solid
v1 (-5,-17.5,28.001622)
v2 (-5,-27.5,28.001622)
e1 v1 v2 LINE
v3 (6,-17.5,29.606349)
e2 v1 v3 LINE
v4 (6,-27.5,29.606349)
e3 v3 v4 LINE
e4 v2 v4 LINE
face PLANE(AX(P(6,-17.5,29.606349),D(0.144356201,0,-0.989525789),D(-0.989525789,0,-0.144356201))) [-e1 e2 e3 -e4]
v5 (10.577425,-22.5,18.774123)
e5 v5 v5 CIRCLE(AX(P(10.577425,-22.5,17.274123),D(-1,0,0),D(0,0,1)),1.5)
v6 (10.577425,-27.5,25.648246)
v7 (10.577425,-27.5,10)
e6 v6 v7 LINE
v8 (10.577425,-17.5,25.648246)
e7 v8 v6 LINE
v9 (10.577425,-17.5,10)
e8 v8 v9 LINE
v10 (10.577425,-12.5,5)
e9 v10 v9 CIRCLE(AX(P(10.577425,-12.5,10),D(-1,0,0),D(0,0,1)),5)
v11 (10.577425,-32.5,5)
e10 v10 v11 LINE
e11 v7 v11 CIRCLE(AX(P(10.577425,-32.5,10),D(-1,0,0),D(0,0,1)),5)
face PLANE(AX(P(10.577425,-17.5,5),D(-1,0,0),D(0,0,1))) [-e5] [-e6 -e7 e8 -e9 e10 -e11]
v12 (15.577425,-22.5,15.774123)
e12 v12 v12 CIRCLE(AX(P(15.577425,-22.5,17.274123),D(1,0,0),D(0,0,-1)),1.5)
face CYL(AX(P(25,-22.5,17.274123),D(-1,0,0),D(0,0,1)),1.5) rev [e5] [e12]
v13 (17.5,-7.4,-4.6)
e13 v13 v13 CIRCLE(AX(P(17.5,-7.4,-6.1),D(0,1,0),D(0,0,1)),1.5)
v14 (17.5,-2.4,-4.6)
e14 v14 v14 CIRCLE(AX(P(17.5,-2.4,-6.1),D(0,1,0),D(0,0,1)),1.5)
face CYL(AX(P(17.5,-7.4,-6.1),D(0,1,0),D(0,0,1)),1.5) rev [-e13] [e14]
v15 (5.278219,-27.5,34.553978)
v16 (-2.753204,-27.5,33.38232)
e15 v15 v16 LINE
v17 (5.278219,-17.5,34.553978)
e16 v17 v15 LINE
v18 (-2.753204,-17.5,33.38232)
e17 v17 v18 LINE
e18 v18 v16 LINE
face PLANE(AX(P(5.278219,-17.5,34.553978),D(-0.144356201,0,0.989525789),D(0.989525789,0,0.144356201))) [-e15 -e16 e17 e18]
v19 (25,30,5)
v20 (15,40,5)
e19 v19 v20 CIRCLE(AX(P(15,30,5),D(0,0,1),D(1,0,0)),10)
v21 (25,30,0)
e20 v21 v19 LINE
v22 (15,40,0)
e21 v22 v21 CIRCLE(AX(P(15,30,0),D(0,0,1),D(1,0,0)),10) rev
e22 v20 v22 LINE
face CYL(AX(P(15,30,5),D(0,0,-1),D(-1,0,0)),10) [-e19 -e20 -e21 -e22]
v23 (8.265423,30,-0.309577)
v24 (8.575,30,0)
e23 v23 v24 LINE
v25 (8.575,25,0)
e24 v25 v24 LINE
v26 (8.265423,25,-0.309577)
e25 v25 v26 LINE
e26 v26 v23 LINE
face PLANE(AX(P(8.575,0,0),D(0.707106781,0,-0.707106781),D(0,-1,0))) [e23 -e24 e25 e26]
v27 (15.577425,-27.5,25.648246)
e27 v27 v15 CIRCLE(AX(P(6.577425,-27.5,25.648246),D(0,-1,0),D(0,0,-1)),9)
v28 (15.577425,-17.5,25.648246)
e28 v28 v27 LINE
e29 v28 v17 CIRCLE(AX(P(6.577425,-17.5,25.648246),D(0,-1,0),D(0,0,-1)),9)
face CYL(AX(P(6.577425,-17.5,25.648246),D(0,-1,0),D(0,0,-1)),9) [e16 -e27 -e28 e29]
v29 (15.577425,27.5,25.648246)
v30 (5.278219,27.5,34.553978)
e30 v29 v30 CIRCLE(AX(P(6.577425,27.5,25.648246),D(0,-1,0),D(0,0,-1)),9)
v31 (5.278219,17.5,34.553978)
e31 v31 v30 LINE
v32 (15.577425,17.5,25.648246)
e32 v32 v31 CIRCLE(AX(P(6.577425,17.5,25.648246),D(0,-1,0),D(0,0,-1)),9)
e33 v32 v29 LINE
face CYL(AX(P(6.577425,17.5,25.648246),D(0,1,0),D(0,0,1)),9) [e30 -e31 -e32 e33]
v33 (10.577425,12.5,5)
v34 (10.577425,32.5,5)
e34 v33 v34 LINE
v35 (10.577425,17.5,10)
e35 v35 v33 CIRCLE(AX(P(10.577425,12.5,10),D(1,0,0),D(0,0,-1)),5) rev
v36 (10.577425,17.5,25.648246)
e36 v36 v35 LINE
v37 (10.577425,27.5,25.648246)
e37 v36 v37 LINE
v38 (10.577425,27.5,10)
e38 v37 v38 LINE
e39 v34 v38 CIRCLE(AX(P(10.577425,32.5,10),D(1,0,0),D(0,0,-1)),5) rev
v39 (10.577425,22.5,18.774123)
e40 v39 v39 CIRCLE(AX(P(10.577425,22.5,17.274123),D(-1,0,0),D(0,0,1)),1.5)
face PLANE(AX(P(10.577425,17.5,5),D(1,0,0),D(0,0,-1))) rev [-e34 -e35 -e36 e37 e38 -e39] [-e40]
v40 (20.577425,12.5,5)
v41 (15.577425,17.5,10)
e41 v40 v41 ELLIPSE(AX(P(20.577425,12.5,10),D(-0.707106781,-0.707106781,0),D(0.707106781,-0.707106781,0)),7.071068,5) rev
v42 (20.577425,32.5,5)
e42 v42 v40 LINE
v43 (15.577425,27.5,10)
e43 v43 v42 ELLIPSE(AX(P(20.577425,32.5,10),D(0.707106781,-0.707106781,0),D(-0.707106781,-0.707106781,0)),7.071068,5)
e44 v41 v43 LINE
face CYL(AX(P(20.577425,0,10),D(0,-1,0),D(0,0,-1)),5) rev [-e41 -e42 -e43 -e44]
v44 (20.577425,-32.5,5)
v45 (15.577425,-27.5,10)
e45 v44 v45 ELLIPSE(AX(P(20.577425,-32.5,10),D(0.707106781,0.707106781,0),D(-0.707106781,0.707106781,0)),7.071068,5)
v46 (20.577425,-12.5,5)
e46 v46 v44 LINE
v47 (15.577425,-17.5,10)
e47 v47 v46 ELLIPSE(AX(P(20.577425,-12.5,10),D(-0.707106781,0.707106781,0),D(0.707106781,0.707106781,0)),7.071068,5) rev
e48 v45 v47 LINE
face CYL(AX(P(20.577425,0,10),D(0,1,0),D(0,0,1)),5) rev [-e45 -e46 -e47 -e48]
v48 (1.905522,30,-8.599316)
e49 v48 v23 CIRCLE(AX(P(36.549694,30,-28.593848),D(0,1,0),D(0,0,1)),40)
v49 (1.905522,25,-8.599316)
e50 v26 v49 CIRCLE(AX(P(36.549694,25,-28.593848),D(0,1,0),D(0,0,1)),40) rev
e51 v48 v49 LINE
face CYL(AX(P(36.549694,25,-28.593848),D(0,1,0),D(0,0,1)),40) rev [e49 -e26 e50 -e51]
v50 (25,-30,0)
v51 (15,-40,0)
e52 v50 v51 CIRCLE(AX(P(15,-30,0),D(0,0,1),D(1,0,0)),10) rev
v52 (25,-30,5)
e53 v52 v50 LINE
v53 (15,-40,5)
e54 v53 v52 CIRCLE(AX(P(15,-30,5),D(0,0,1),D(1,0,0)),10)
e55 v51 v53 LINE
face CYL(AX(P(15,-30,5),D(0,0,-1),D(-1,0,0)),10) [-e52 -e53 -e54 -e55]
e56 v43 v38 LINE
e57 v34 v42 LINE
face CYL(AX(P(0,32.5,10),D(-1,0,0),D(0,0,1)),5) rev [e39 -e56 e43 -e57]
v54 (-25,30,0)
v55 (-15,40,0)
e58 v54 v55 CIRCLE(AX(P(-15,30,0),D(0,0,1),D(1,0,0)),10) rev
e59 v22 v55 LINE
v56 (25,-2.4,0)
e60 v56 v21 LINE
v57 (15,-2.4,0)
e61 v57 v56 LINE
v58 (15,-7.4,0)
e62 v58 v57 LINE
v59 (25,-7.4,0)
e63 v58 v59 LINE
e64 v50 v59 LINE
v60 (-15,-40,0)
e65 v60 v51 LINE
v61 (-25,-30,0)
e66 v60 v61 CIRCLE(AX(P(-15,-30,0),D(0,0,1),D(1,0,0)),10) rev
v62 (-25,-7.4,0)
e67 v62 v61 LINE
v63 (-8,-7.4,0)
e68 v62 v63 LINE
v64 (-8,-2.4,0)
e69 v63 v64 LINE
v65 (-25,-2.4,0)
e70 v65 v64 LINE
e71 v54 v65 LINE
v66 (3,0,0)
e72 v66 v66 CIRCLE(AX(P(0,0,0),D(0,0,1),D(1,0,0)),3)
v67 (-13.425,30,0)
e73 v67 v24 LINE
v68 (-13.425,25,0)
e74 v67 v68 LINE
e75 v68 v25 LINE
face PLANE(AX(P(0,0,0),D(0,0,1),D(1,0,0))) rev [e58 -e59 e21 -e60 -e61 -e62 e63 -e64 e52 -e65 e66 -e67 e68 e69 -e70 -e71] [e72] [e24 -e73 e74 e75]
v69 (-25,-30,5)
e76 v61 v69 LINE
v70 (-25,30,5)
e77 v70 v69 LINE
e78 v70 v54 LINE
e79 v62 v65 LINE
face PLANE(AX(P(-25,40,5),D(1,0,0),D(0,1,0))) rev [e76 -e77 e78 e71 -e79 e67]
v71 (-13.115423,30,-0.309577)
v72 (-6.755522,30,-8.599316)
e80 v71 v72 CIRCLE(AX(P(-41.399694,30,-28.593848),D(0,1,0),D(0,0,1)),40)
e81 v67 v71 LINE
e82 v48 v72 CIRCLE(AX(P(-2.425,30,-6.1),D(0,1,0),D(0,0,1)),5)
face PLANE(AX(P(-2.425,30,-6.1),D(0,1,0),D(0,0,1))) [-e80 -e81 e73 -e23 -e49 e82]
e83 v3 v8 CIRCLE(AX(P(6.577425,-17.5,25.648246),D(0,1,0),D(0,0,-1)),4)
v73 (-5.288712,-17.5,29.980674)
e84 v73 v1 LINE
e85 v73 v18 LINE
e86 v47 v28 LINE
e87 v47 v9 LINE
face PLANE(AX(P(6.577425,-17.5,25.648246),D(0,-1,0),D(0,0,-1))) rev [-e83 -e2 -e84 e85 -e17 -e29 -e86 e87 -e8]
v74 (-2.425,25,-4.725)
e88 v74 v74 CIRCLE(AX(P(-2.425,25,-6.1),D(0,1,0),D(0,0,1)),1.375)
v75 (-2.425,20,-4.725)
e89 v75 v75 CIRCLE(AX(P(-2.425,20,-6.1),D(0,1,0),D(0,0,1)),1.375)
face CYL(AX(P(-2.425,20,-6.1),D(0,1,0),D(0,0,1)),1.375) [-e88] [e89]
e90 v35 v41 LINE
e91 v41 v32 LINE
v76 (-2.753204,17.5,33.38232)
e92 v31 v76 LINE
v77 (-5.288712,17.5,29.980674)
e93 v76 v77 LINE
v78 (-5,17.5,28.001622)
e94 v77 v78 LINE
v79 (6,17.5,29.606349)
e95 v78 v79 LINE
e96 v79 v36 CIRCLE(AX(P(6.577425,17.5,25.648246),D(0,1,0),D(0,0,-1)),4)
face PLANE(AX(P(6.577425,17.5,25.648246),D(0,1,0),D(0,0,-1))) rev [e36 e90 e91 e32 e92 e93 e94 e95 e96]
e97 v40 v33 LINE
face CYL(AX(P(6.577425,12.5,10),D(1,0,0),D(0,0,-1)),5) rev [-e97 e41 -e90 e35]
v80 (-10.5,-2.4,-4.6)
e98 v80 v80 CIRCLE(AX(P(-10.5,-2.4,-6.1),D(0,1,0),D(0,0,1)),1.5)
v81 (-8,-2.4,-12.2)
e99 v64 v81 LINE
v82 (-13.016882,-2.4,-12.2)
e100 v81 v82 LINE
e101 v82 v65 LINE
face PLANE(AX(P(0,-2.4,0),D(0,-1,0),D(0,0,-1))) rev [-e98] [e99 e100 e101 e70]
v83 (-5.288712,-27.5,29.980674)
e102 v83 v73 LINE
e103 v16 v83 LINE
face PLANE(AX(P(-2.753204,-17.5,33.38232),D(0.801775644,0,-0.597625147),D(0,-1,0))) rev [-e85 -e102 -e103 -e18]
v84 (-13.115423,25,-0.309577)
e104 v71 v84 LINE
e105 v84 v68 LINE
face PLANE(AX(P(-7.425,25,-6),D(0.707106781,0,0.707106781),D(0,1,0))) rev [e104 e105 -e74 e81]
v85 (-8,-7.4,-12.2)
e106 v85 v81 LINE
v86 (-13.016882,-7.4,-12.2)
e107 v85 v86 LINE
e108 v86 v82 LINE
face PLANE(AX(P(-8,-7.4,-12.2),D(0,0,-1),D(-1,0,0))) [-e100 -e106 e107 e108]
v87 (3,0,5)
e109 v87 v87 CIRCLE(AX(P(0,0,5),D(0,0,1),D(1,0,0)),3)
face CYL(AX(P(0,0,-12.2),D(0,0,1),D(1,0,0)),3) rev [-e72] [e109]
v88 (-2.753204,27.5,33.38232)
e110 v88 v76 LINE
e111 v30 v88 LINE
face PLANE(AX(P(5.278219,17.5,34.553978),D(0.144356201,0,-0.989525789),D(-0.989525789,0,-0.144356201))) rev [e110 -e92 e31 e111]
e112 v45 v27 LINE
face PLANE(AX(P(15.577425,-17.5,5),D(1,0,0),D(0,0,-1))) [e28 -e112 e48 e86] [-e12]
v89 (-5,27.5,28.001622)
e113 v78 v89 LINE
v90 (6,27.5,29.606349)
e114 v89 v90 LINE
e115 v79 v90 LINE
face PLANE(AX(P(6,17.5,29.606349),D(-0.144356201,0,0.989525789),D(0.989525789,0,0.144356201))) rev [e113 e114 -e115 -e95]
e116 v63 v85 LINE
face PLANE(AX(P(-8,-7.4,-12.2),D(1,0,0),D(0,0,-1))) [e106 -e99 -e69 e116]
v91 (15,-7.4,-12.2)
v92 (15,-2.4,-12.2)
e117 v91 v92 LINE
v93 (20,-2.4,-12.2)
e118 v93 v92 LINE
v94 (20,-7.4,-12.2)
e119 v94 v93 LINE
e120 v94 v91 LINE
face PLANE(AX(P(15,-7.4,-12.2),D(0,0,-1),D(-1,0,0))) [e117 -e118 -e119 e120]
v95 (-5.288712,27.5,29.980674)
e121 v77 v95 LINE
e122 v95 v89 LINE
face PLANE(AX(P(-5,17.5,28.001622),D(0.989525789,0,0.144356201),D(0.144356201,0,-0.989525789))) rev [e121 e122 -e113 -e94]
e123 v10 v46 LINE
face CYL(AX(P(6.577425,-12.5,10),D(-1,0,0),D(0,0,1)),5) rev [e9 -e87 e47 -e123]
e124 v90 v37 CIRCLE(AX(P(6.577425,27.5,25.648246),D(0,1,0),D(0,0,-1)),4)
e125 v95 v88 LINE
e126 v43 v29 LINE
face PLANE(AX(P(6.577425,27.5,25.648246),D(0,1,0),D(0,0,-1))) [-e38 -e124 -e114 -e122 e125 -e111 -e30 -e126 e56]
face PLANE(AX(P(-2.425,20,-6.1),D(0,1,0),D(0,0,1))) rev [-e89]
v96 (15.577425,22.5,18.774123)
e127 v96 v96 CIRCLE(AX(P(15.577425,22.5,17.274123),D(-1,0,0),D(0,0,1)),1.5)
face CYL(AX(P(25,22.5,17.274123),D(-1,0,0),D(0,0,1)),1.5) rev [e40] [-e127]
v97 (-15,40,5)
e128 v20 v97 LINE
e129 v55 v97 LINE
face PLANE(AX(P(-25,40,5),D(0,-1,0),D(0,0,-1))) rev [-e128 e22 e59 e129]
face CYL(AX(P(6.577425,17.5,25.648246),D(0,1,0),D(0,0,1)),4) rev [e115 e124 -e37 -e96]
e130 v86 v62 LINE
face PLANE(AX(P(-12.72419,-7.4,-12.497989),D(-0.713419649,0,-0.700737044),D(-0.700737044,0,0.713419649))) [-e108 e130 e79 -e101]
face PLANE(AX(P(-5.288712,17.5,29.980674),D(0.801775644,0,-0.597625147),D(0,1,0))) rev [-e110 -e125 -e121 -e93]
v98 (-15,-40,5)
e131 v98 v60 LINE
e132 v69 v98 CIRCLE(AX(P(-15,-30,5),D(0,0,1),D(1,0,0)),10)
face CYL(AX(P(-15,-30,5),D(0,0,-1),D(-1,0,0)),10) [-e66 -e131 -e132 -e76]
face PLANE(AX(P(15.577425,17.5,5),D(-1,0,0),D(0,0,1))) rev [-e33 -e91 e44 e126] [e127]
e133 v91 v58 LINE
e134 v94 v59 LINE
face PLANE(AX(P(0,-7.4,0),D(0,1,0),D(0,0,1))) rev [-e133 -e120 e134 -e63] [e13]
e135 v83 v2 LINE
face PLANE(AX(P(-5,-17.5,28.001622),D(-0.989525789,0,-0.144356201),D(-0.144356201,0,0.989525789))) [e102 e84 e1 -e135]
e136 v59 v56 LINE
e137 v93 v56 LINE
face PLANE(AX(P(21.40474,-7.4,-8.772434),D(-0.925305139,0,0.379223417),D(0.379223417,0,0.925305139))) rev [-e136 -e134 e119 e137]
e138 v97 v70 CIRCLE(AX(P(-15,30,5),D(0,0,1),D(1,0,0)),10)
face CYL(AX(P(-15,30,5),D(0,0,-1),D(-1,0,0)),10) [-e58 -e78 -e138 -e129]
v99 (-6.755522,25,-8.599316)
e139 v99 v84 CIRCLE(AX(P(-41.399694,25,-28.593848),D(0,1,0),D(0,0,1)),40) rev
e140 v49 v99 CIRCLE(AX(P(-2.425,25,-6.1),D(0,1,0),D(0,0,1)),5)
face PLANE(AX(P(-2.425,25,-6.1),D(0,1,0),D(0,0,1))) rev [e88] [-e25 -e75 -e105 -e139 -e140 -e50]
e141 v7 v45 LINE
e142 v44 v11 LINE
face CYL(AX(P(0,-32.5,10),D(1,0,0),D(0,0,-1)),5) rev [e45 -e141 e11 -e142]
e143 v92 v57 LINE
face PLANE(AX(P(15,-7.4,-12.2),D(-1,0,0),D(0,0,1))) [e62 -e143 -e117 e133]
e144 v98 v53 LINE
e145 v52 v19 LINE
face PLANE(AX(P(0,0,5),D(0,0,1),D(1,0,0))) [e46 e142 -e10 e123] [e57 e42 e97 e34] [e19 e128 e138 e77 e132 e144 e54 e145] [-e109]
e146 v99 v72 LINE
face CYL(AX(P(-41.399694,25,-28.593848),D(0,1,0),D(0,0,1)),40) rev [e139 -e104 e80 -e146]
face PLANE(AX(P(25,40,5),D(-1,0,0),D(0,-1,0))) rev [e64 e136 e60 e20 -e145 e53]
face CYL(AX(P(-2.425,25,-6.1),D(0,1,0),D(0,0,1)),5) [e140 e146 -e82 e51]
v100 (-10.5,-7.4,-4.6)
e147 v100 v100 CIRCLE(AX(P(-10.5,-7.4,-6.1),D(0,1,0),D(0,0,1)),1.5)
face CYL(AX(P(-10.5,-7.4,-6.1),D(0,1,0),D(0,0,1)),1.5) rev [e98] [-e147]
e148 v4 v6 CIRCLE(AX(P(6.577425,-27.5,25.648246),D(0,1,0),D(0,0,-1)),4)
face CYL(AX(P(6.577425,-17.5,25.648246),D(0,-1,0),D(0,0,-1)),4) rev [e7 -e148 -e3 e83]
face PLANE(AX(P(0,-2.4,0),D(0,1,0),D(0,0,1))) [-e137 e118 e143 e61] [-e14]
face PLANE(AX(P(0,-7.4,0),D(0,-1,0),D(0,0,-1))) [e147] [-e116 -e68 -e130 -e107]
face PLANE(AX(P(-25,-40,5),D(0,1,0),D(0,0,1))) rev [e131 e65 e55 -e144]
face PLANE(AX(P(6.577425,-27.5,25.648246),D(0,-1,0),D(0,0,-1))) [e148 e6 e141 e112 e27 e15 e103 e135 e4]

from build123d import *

# Parameters (mm, degrees)
ESQUISSE1_W             = 50
ESQUISSE1_H             = 80
BOSS_EXTRU_1_DEPTH      = 5
BOSS_EXTRU_2_START      = -42.4
ESQUISSE2_W             = 5
ESQUISSE2_H             = 12.2
ESQUISSE2_R             = 1.5
ESQUISSE2_W_2           = 5.01688185
BOSS_EXTRU_2_DEPTH      = 5
ESQUISSE3_R             = 3
ENL_V_MAT_EXTRU_1_DEPTH = 51.207967495
BOSS_EXTRU_3_START      = -10
ESQUISSE5_R             = 1.375
BOSS_EXTRU_3_DEPTH      = 5
ESQUISSE6_R             = 1.375
BOSS_EXTRU_4_DEPTH      = 10
BOSS_EXTRU_5_START      = -12.5
BOSS_EXTRU_5_DEPTH      = 10
CONG_1_R                = 5
CONG_2_R                = 5
CONG_3_R                = 5
CONG_1_OF_SYM_TRIE1_R   = 5
CONG_2_OF_SYM_TRIE1_R   = 5
CONG_3_OF_SYM_TRIE1_R   = 5
CHANFREIN1_SIZE         = 3
BOSS_EXTRU_6_DEPTH      = 5
ESQUISSE10_R            = 1.5
ENL_V_MAT_EXTRU_2_DEPTH = 64.767186518
CONG_4_R                = 10
CHANFREIN5_START        = -9.492908537
CHANFREIN5_OUTLINE_W    = 12
CHANFREIN5_OUTLINE_H    = 5
CHANFREIN5_DEPTH        = 4.242640687
CHANFREIN6_START        = 1.820799962
CHANFREIN6_OUTLINE_W    = 12
CHANFREIN6_OUTLINE_H    = 5
CHANFREIN6_DEPTH        = 4.242640687
CONG_5_START            = 25
CONG_5_DEPTH            = 5
CONG_6_START            = 25
CONG_6_DEPTH            = 5


with BuildPart() as part:
    # Esquisse1 → Boss.-Extru.1 (new body)
    with BuildSketch(Plane.XY):
        Rectangle(ESQUISSE1_W, ESQUISSE1_H)
    extrude(amount=BOSS_EXTRU_1_DEPTH)

    # Esquisse2 → Boss.-Extru.2 (add)
    # profile 1 of 2: a face of its own
    with BuildSketch(Plane(origin=(0, 40, 0), x_dir=(1, 0, 0), z_dir=(0, 1, 0)).offset(BOSS_EXTRU_2_START)):
        with Locations((17.5, 6.1)):
            Rectangle(ESQUISSE2_W, ESQUISSE2_H)
        with Locations(Location((17.5, 6.1, 0), (0, 0, 270))):
            Circle(ESQUISSE2_R, mode=Mode.SUBTRACT)
    # profile 2 of 2: a face of its own
    with BuildSketch(Plane(origin=(0, 40, 0), x_dir=(1, 0, 0), z_dir=(0, 1, 0)).offset(BOSS_EXTRU_2_START)):
        with Locations((-10.508440925, 6.1)):
            Rectangle(ESQUISSE2_W_2, ESQUISSE2_H)
        with Locations(Location((-10.5, 6.1, 0), (0, 0, 270))):
            Circle(ESQUISSE2_R, mode=Mode.SUBTRACT)
    extrude(amount=-BOSS_EXTRU_2_DEPTH)

    # Esquisse3 → Enlèv. mat.-Extru.1 (cut, through all)
    with BuildSketch(Plane.XY.offset(5)):
        Circle(ESQUISSE3_R)
    extrude(amount=-ENL_V_MAT_EXTRU_1_DEPTH, mode=Mode.SUBTRACT)

    # Esquisse5 → Boss.-Extru.3 (add)
    with BuildSketch(Plane(origin=(0, 40, 0), x_dir=(1, 0, 0), z_dir=(0, 1, 0)).offset(BOSS_EXTRU_3_START)):
        with BuildLine():
            Line((-7.425, 6.1), (-7.425, 0))
            Line((-7.425, 0), (2.575, 0))
            Line((2.575, 0), (2.575, 6.1))
            ThreePointArc((2.575, 6.1), (-2.425, 11.1), (-7.425, 6.1))
        make_face()
        with Locations(Location((-2.425, 6.1, 0), (0, 0, 270))):
            Circle(ESQUISSE5_R, mode=Mode.SUBTRACT)
    extrude(amount=-BOSS_EXTRU_3_DEPTH)

    # Esquisse6 → Boss.-Extru.4 (add)
    with BuildSketch(Plane(origin=(0, 30, 0), x_dir=(1, 0, 0), z_dir=(0, 1, 0))):
        with Locations(Location((-2.425, 6.1, 0), (0, 0, 270))):
            Circle(ESQUISSE6_R)
    extrude(amount=-BOSS_EXTRU_4_DEPTH)

    # Esquisse7 → Boss.-Extru.5 (add)
    with BuildSketch(Plane.XZ.offset(40).offset(BOSS_EXTRU_5_START)):
        with BuildLine():
            Line((10.577424804, 5), (10.577424804, 25.648245565))
            ThreePointArc((10.577424804, 25.648245565), (9.193748636, 28.673943766), (6, 29.606348721))
            Line((6, 29.606348721), (-5, 28.001622266))
            Line((-5, 28.001622266), (-5.721781005, 32.949251212))
            Line((-5.721781005, 32.949251212), (5.278218995, 34.553977666))
            ThreePointArc((5.278218995, 34.553977666), (12.464153425, 32.456066518), (15.577424804, 25.648245565))
            Line((15.577424804, 25.648245565), (15.577424804, 5))
            Line((15.577424804, 5), (10.577424804, 5))
        make_face()
    boss_extru_5 = extrude(amount=-BOSS_EXTRU_5_DEPTH)

    # Congé1
    cong_1_edges = [part.edges().sort_by_distance(p)[0] for p in [
        (15.577424804, -22.5, 5),
    ]]
    fillet(cong_1_edges, radius=CONG_1_R)

    # Congé2
    cong_2_edges = [part.edges().sort_by_distance(p)[0] for p in [
        (15.577424804, -17.5, 5),
    ]]
    fillet(cong_2_edges, radius=CONG_2_R)

    # Congé3
    cong_3_edges = [part.edges().sort_by_distance(p)[0] for p in [
        (15.577424804, -27.5, 5),
    ]]
    fillet(cong_3_edges, radius=CONG_3_R)

    # Symétrie1: Boss.-Extru.5 across plane
    add(boss_extru_5.mirror(Plane.ZX))

    # Congé1 of Symétrie1
    cong_1_of_sym_trie1_edges = [part.edges().sort_by_distance(p)[0] for p in [
        (15.577424804, 22.5, 5),
    ]]
    fillet(cong_1_of_sym_trie1_edges, radius=CONG_1_OF_SYM_TRIE1_R)

    # Congé2 of Symétrie1
    cong_2_of_sym_trie1_edges = [part.edges().sort_by_distance(p)[0] for p in [
        (15.577424804, 17.5, 5),
    ]]
    fillet(cong_2_of_sym_trie1_edges, radius=CONG_2_OF_SYM_TRIE1_R)

    # Congé3 of Symétrie1
    cong_3_of_sym_trie1_edges = [part.edges().sort_by_distance(p)[0] for p in [
        (15.577424804, 27.5, 5),
    ]]
    fillet(cong_3_of_sym_trie1_edges, radius=CONG_3_OF_SYM_TRIE1_R)

    # Chanfrein1
    chanfrein1_edges = [part.edges().sort_by_distance(p)[0] for p in [
        (-5.721781005, 22.5, 32.949251212),
        (-5.721781005, -22.5, 32.949251212),
    ]]
    chamfer(chanfrein1_edges, length=CHANFREIN1_SIZE)

    # Esquisse9 → Boss.-Extru.6 (add)
    with BuildSketch(Plane(origin=(0, -2.4, 0), x_dir=(1, 0, 0), z_dir=(0, 1, 0))):
        Polygon((-13.01688185, 12.2), (-25, 0), (-13.01688185, 0), align=None)
        Polygon((20, 12.2), (25, 0), (20, 0), align=None)
    extrude(amount=-BOSS_EXTRU_6_DEPTH)

    # Esquisse10 → Enlèv. mat.-Extru.2 (cut, through all)
    with BuildSketch(Plane.ZY.offset(-10.577424804)):
        with Locations((17.274122782, -22.5)):
            Circle(ESQUISSE10_R)
        with Locations((17.274122782, 22.5)):
            Circle(ESQUISSE10_R)
    extrude(amount=-ENL_V_MAT_EXTRU_2_DEPTH, mode=Mode.SUBTRACT)

    # Congé4
    cong_4_edges = [part.edges().sort_by_distance(p)[0] for p in [
        (25, -40, 2.5),
        (-25, -40, 2.5),
        (-25, 40, 2.5),
        (25, 40, 2.5),
    ]]
    fillet(cong_4_edges, radius=CONG_4_R)

    # Chanfrein5: read off the stored shape, not the designer's step
    # Chanfrein5 outline → Chanfrein5 (add)
    with BuildSketch(Plane(origin=(0, 0, 0), x_dir=(0.707106781186548, 0, -0.707106781186547), z_dir=(0.707106781186547, 0, 0.707106781186548)).offset(CHANFREIN5_START)):
        with Locations((-5, 27.5)):
            Rectangle(CHANFREIN5_OUTLINE_W, CHANFREIN5_OUTLINE_H)
    extrude(amount=CHANFREIN5_DEPTH)

    # Chanfrein6: read off the stored shape, not the designer's step
    # Chanfrein6 outline → Chanfrein6 (add)
    with BuildSketch(Plane(origin=(0, 0, 0), x_dir=(0.707106781186548, 0, 0.707106781186547), z_dir=(0.707106781186547, 0, -0.707106781186548)).offset(CHANFREIN6_START)):
        with Locations((2, -27.5)):
            Rectangle(CHANFREIN6_OUTLINE_W, CHANFREIN6_OUTLINE_H)
    extrude(amount=CHANFREIN6_DEPTH)

    # Congé5: read off the stored shape, not the designer's step
    # Congé5 outline → Congé5 (add)
    with BuildSketch(Plane(origin=(0, 0, 0), x_dir=(1, 0, 0), z_dir=(0, 1, 0)).offset(CONG_5_START)):
        with BuildLine():
            ThreePointArc((-6.755521581, 8.599316474), (-9.663638899, 4.245895741), (-13.11542298, 0.30957702))
            Line((-13.11542298, 0.30957702), (-7.425, 6))
            Line((-7.425, 6), (-7.425, 6.1))
            ThreePointArc((-7.425, 6.1), (-7.254731251, 7.393714052), (-6.755521581, 8.599316474))
        make_face()
    extrude(amount=CONG_5_DEPTH)

    # Congé6: read off the stored shape, not the designer's step
    # Congé6 outline → Congé6 (add)
    with BuildSketch(Plane(origin=(0, 0, 0), x_dir=(1, 0, 0), z_dir=(0, 1, 0)).offset(CONG_6_START)):
        with BuildLine():
            ThreePointArc((8.26542298, 0.30957702), (4.813638899, 4.245895741), (1.905521581, 8.599316474))
            ThreePointArc((1.905521581, 8.599316474), (2.40473125, 7.393714052), (2.575, 6.1))
            Line((2.575, 6.1), (2.575, 6))
            Line((2.575, 6), (8.26542298, 0.30957702))
        make_face()
    extrude(amount=CONG_6_DEPTH)


solid = part.part
